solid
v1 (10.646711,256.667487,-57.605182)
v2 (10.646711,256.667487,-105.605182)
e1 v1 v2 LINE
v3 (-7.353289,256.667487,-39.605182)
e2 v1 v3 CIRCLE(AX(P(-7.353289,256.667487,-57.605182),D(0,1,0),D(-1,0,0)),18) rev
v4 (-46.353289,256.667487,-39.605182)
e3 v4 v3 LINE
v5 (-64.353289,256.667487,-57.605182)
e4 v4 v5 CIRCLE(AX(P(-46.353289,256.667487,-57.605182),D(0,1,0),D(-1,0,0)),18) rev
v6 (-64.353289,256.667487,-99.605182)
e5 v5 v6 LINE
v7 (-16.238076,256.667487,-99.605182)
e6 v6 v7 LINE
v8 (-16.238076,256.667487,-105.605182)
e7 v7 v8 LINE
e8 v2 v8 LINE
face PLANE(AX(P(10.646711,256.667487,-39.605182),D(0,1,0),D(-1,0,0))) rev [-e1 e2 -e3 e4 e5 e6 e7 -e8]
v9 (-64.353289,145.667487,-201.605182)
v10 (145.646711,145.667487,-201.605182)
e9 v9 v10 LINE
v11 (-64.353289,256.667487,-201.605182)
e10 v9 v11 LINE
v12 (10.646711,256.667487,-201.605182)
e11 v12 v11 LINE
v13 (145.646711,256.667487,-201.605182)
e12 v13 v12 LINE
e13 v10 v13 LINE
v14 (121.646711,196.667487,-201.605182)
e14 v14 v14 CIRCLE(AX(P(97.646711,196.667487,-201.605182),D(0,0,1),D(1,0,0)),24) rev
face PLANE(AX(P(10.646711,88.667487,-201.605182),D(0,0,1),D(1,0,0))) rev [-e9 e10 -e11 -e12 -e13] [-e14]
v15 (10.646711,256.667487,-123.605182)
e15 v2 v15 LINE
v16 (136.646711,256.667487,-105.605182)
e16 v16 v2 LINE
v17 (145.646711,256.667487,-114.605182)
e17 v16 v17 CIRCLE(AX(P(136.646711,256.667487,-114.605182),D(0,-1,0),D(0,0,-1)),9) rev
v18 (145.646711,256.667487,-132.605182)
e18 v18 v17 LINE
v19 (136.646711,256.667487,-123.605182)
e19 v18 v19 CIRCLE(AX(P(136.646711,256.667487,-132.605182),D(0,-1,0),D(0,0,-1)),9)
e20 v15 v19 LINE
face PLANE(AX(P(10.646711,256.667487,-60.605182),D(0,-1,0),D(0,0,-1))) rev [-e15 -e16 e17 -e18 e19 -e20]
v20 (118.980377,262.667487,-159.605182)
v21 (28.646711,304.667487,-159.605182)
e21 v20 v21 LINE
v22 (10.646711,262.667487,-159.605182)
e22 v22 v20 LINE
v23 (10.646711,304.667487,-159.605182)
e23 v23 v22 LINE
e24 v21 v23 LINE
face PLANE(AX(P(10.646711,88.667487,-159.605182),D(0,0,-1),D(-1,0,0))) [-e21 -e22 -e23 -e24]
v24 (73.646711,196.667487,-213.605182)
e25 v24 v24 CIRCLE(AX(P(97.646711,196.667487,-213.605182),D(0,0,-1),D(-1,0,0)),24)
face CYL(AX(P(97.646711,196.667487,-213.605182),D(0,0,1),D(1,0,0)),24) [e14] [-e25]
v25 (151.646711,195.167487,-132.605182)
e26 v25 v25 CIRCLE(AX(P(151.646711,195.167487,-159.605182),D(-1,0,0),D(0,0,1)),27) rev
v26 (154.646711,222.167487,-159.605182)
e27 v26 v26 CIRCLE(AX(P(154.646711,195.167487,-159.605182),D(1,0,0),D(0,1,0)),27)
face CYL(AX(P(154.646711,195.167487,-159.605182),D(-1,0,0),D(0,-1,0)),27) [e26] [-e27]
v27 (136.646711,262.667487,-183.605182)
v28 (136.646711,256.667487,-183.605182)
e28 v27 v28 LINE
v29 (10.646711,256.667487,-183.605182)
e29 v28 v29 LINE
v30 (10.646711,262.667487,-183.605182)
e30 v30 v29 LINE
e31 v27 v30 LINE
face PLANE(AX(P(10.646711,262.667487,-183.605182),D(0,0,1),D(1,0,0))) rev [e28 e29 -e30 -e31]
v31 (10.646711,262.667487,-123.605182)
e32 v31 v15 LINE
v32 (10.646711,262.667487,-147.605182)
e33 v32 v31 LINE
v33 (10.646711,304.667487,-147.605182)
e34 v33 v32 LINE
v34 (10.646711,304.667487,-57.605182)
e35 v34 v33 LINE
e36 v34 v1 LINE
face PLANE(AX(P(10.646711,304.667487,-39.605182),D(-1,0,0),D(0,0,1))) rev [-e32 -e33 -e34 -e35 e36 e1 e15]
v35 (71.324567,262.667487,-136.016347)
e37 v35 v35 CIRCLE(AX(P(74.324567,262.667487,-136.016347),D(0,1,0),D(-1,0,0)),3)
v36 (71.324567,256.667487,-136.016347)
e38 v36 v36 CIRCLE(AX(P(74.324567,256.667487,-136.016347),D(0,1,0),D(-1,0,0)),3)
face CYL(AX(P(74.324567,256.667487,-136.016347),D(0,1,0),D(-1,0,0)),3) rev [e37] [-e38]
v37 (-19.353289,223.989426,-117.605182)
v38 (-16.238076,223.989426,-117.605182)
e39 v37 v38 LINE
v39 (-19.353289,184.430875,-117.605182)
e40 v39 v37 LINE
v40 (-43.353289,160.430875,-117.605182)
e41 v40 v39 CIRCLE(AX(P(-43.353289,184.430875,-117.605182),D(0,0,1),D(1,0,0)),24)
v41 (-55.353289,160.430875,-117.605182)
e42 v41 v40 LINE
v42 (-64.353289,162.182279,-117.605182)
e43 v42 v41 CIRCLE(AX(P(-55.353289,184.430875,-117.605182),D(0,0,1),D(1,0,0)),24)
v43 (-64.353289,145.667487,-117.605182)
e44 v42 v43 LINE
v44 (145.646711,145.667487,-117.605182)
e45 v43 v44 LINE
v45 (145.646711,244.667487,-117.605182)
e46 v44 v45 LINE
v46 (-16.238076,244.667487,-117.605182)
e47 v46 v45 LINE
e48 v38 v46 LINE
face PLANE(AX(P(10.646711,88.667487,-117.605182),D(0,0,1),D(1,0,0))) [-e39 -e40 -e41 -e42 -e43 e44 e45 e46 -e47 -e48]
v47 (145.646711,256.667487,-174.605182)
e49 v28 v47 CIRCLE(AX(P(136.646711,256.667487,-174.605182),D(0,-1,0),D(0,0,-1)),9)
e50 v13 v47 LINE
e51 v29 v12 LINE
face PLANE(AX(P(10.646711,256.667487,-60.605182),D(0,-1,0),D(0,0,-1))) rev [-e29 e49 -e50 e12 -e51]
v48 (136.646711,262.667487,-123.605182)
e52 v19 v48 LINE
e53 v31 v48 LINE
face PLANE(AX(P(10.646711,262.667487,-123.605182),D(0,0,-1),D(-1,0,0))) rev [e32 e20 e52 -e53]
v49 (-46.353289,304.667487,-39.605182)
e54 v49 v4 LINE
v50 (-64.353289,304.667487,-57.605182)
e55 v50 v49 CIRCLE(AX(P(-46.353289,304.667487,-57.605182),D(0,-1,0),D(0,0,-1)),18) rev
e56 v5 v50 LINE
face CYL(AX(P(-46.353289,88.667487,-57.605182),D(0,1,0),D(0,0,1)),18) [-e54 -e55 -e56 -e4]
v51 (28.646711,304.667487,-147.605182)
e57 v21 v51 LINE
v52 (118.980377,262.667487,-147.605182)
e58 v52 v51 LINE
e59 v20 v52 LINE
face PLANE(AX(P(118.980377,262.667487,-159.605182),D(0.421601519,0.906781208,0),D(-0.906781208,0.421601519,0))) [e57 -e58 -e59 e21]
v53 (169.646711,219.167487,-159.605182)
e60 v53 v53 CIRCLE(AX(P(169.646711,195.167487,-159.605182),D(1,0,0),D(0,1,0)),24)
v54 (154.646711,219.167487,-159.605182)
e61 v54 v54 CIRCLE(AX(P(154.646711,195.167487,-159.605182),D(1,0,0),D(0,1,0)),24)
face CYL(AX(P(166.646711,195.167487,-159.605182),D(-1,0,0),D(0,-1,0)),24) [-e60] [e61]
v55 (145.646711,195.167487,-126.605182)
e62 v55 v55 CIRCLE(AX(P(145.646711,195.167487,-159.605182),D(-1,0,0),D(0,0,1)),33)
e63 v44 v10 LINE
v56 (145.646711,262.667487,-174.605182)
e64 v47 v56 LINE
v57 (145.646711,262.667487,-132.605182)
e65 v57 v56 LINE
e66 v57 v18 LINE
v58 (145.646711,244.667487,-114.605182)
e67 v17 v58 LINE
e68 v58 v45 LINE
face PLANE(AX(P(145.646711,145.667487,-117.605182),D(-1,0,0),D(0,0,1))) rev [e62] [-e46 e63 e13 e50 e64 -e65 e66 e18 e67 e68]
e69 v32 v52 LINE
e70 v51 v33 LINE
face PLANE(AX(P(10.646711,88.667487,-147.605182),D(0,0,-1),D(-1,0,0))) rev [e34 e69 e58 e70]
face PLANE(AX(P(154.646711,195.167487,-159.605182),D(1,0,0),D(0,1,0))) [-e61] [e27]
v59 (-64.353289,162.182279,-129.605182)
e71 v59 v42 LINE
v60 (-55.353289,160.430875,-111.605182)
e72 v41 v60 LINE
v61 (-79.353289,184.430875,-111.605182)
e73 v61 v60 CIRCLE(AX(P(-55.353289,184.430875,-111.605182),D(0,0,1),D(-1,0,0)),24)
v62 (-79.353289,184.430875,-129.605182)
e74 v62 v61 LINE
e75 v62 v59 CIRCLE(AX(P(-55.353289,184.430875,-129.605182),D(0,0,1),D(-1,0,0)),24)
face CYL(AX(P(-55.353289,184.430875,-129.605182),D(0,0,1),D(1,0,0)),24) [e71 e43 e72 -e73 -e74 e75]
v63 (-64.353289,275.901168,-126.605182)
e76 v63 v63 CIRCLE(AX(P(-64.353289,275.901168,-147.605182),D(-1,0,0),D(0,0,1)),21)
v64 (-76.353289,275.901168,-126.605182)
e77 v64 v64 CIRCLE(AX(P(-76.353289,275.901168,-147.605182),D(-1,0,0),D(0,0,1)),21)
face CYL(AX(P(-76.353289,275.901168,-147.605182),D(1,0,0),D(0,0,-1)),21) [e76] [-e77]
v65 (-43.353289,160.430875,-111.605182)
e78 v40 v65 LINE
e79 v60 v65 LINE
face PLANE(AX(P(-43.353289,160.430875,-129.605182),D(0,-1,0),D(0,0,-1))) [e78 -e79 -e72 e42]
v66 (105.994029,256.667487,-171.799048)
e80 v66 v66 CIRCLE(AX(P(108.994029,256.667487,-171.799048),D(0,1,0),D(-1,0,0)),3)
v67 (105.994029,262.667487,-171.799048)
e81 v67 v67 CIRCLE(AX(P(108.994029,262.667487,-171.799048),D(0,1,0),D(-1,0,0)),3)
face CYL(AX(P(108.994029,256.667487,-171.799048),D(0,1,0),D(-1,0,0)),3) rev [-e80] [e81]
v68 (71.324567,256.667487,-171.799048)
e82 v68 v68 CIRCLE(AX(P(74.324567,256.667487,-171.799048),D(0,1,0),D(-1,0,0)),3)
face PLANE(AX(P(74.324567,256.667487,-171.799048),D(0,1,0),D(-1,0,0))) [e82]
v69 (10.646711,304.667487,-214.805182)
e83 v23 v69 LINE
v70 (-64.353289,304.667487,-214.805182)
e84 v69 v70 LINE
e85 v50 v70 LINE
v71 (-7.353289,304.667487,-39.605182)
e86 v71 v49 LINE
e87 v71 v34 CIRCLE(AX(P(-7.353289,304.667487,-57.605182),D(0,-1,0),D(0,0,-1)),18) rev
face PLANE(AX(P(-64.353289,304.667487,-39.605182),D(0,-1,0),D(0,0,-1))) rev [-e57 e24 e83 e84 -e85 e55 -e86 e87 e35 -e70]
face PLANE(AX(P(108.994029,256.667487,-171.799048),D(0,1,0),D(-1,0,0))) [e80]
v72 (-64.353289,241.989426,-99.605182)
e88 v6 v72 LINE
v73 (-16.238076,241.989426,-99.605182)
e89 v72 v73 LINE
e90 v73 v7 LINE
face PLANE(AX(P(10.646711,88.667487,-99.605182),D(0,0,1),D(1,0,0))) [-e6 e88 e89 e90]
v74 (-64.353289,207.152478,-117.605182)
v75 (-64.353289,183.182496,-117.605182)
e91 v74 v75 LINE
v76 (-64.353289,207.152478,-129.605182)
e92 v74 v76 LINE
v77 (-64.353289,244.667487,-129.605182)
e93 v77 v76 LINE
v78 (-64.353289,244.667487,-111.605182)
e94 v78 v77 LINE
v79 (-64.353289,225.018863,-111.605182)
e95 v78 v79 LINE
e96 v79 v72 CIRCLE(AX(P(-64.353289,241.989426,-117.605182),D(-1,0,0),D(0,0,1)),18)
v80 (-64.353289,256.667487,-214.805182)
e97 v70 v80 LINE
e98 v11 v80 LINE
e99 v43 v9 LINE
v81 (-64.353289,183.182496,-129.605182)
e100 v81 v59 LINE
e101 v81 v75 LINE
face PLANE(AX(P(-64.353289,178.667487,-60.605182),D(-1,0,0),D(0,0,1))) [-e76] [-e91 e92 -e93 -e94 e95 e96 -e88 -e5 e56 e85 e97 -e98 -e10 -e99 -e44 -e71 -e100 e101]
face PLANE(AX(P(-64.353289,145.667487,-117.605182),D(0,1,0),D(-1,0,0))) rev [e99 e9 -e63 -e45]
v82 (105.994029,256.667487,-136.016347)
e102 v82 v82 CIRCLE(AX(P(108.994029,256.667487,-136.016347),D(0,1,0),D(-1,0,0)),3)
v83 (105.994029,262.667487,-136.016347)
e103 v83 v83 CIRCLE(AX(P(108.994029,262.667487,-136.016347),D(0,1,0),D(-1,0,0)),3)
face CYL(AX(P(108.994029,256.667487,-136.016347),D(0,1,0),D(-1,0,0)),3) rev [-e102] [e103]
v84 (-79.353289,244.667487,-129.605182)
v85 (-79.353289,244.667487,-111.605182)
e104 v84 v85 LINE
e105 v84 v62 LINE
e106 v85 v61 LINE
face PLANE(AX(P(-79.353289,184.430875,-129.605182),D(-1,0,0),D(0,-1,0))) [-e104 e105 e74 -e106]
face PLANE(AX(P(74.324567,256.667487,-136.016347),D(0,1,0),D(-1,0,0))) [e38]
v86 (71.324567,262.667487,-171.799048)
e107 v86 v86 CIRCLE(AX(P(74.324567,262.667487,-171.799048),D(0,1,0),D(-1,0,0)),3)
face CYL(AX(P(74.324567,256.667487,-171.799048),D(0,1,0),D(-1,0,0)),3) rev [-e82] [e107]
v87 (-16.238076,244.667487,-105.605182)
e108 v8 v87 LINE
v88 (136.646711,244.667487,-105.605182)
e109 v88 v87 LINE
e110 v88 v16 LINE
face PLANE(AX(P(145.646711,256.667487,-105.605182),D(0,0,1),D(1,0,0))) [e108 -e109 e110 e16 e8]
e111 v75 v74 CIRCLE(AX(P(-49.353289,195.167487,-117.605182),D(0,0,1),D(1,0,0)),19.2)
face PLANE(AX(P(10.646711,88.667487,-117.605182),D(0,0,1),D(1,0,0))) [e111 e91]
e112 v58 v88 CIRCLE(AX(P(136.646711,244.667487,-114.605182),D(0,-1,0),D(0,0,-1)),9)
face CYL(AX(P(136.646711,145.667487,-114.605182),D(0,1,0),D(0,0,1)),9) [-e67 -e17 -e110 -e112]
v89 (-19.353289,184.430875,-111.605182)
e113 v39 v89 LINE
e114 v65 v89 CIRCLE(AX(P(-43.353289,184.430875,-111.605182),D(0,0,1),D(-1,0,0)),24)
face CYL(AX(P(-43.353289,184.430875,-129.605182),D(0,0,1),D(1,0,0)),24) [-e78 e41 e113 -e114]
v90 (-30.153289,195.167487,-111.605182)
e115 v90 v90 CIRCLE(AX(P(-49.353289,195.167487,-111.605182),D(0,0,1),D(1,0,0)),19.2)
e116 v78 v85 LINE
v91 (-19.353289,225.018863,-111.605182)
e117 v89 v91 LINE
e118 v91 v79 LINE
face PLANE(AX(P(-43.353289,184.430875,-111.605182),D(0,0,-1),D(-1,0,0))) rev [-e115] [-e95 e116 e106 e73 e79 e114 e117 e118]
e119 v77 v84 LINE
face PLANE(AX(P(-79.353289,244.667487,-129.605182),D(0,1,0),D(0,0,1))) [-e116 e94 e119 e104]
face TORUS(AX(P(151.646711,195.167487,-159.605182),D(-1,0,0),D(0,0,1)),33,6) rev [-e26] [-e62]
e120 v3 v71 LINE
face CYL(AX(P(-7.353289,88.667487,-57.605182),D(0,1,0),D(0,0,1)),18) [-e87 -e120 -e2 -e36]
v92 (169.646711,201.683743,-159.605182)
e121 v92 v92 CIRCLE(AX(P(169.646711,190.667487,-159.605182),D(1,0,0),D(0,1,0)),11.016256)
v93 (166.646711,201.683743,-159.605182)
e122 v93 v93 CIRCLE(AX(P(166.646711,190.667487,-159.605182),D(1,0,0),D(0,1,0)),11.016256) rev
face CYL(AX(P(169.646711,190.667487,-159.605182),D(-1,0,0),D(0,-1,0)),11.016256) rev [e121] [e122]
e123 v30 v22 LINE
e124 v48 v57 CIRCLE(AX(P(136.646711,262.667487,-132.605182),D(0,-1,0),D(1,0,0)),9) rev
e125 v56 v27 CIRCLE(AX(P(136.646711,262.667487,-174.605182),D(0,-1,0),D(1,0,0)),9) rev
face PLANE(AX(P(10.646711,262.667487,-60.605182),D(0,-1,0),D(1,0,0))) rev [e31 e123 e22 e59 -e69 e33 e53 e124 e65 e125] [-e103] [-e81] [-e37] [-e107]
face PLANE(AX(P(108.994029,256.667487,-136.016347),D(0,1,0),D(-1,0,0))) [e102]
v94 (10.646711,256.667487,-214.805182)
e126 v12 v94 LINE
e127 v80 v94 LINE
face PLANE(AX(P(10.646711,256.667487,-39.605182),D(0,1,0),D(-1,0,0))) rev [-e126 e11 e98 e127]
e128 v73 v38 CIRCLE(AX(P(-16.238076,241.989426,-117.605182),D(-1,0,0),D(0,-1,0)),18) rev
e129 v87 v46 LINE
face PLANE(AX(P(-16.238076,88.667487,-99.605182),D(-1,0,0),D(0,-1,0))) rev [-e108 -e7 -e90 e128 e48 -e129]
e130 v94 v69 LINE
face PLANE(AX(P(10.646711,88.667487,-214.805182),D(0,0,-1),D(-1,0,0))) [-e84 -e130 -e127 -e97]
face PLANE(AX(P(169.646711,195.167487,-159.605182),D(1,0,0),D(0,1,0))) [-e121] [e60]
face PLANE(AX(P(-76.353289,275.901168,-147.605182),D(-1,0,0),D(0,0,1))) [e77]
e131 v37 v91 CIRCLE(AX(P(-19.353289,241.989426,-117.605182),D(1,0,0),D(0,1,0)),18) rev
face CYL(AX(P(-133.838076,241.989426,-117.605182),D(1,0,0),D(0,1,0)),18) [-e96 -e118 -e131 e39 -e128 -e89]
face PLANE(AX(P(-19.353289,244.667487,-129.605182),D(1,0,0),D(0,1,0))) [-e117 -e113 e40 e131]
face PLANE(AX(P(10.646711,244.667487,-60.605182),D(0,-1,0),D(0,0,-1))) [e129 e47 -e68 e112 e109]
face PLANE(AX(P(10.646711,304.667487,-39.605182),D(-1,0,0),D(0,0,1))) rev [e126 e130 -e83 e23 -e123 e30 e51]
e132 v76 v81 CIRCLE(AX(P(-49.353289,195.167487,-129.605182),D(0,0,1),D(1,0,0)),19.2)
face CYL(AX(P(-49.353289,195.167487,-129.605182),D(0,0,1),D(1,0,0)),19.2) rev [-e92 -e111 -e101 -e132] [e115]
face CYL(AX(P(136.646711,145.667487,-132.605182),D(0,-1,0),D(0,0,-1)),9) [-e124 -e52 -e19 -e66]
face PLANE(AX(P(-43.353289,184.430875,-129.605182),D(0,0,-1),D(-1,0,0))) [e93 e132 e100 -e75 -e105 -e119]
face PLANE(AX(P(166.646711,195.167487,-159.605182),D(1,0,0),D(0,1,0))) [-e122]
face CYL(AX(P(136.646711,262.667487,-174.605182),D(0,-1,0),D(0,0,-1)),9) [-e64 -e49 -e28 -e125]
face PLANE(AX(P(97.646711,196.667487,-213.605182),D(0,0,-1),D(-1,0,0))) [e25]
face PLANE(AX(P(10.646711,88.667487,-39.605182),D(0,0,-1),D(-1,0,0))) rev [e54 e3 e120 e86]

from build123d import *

# Parameters (mm, degrees)
BOSS_EXTRUDE1_DEPTH       = 150
BOSS_EXTRUDE1_DEPTH_BACK  = 100
SKETCH1_W                 = 250
SKETCH1_H                 = 230
SKETCH2_W                 = 200
SKETCH2_H                 = 30
BOSS_EXTRUDE2_DEPTH       = 150
BOSS_EXTRUDE3_DEPTH       = 120
BOSS_EXTRUDE3_DEPTH_BACK  = 20
SKETCH4_W                 = 350
SKETCH4_H                 = 165
RIB1_REACH                = 447.477
SKETCH5_WALL_W            = 1072.6047598
SKETCH5_WALL_H            = 250
SKETCH6_R                 = 45
BOSS_EXTRUDE4_DEPTH       = 15
SKETCH7_R                 = 40
BOSS_EXTRUDE5_DEPTH       = 20
SKETCH8_W                 = 100
SKETCH8_H                 = 100
SKETCH10_W                = 20
SKETCH10_H                = 100
BOSS_EXTRUDE6_DEPTH       = 150
RIB2_REACH                = 449.985
SKETCH12_WALL_W           = 999.204922194
SKETCH12_WALL_H           = 20
SKETCH13_R                = 32
CUT_EXTRUDE1_DEPTH        = 10
FILLET1_R                 = 50
FILLET2_R                 = 30
FILLET3_R                 = 15
FILLET4_R                 = 15
SKETCH14_R                = 40
SKETCH14_R_2              = 18.360426304
BOSS_EXTRUDE7_DEPTH       = 5
FILLET6_R                 = 10
SKETCH15_W                = 250
SKETCH15_H                = 230
SKETCH15_W_2              = 170
SKETCH15_H_2              = 165.671954638
CUT_EXTRUDE2_DEPTH        = 40
SKETCH16_R                = 50
SKETCH16_R_2              = 30
BOSS_EXTRUDE8_DEPTH       = 30
SKETCH16_2_R              = 30
BOSS_EXTRUDE9_DEPTH       = 50
SKETCH17_W                = 787.442297404
SKETCH17_H                = 468.570764298
CUT_EXTRUDE3_DEPTH        = 459.262102583
SKETCH18_W                = 754.820557273
SKETCH18_H                = 297.051261894
CUT_EXTRUDE4_DEPTH        = 391.736484091
BOSS_EXTRUDE10_DEPTH      = 30
BOSS_EXTRUDE11_DEPTH      = 20
BOSS_EXTRUDE12_DEPTH      = 100
BOSS_EXTRUDE12_DEPTH_BACK = 192
SKETCH23_W                = 125
SKETCH23_H                = 80
SKETCH26_W                = 38.43559463
SKETCH26_H                = 130.536564267
CUT_EXTRUDE8_DEPTH        = 196
SKETCH27_W                = 225
SKETCH27_H                = 100
BOSS_EXTRUDE14_DEPTH      = 10
BOSS_EXTRUDE15_DEPTH      = 10
BOSS_EXTRUDE15_DEPTH_BACK = 10
SKETCH29_R                = 35
BOSS_EXTRUDE16_DEPTH      = 20
FILLET7_R                 = 15
FILLET9_R                 = 15
SKETCH33_R                = 40
BOSS_EXTRUDE17_DEPTH      = 20
SKETCH31_R                = 5
CUT_EXTRUDE10_DEPTH       = 10
BOSS_EXTRUDE18_DEPTH      = 10
BOSS_EXTRUDE18_DEPTH_BACK = 20
SKETCH20_R                = 32
FILLET10_R                = 30
SCALE1_SCALE              = 0.6


with BuildPart() as part:
    # Sketch1 → Boss-Extrude1 (new, two sides: drawn at the far end of the back side and taken through both)
    with BuildSketch(Plane(origin=(0, 0, 0), x_dir=(1, 0, 0), z_dir=(0, 1, 0)).offset(-BOSS_EXTRUDE1_DEPTH_BACK)):
        Rectangle(SKETCH1_W, SKETCH1_H)
    extrude(amount=BOSS_EXTRUDE1_DEPTH + BOSS_EXTRUDE1_DEPTH_BACK)

    # Sketch2 → Boss-Extrude2 (add)
    with BuildSketch(Plane(origin=(125, 0, 0), x_dir=(0, 0, -1), z_dir=(1, 0, 0))):
        with Locations((0, -15)):
            Rectangle(SKETCH2_W, SKETCH2_H)
    extrude(amount=BOSS_EXTRUDE2_DEPTH)

    # Sketch4 → Boss-Extrude3 (add, two sides: drawn at the far end of the back side and taken through both)
    with BuildSketch(Plane(origin=(0, 0, -115), x_dir=(-1, 0, 0), z_dir=(0, 0, -1)).offset(-BOSS_EXTRUDE3_DEPTH_BACK)):
        with Locations((-50, 177.5)):
            Rectangle(SKETCH4_W, SKETCH4_H)
    extrude(amount=BOSS_EXTRUDE3_DEPTH + BOSS_EXTRUDE3_DEPTH_BACK)

    # Sketch5 wall → Rib1 (add, up to next)
    with BuildSketch(Plane(origin=(0, 205, -23.982044646), x_dir=(0, 0.612300963241, -0.790624772199), z_dir=(0, 0.790624772199, 0.612300963241)), mode=Mode.PRIVATE) as rib1_sk1:
        Rectangle(SKETCH5_WALL_W, SKETCH5_WALL_H)
    rib1_tool1 = extrude(rib1_sk1.sketch, amount=-RIB1_REACH, mode=Mode.PRIVATE) - part.part
    add(rib1_tool1.solids().sort_by_distance((0, 205, -23.982044646))[0])

    # Sketch6 → Boss-Extrude4 (add)
    with BuildSketch(Plane(origin=(225, 0, 0), x_dir=(0, 0, -1), z_dir=(1, 0, 0))):
        with Locations(Location((165, 177.5, 0), (0, 0, 90))):
            Circle(SKETCH6_R)
    extrude(amount=BOSS_EXTRUDE4_DEPTH)

    # Sketch7 → Boss-Extrude5 (add)
    with BuildSketch(Plane(origin=(240, 0, 0), x_dir=(0, 0, -1), z_dir=(1, 0, 0))):
        with Locations(Location((165, 177.5, 0), (0, 0, 90))):
            Circle(SKETCH7_R)
    extrude(amount=BOSS_EXTRUDE5_DEPTH)

    # Sweep1: sweep along a path in Sketch9
    with BuildLine(Plane(origin=(0, 0, 0), x_dir=(0, 0, -1), z_dir=(1, 0, 0))) as sweep1_path:
        ThreePointArc((23.982044646, 205), (3.428361586, 247.544867247), (-5.288861265, 293.983317287))
    # Sketch8 → Sweep1 (sweep)
    with BuildSketch(Plane(origin=(0, 116.533228497, 90.24939588), x_dir=(1, 0, 0), z_dir=(0, 0.7906247721978943, 0.6123009632419566))):
        with Locations((0, 144.482496049)):
            Rectangle(SKETCH8_W, SKETCH8_H)
    sweep(path=sweep1_path.line)

    # Sketch10 → Boss-Extrude6 (add)
    with BuildSketch(Plane(origin=(125, 0, 0), x_dir=(0, 0, -1), z_dir=(1, 0, 0))):
        with Locations((85, 164.273096985)):
            Rectangle(SKETCH10_W, SKETCH10_H)
    extrude(amount=BOSS_EXTRUDE6_DEPTH)

    # Sketch12 wall → Rib2 (add, up to next)
    with BuildSketch(Plane(origin=(160.792179202, 164.273096985, -35.792179202), x_dir=(0.707106781187, 0, -0.707106781187), z_dir=(0.707106781187, 0, 0.707106781187)), mode=Mode.PRIVATE) as rib2_sk1:
        Rectangle(SKETCH12_WALL_W, SKETCH12_WALL_H)
    rib2_tool1 = extrude(rib2_sk1.sketch, amount=-RIB2_REACH, mode=Mode.PRIVATE) - part.part
    add(rib2_tool1.solids().sort_by_distance((160.792179202, 164.273096985, -35.792179202))[0])

    # Sketch13 → Cut-Extrude1 (cut)
    with BuildSketch(Plane.XZ.offset(30)):
        with Locations(Location((218.869669038, 0, 0), (0, 0, 270))):
            Circle(SKETCH13_R)
    extrude(amount=-CUT_EXTRUDE1_DEPTH, mode=Mode.SUBTRACT)

    # Fillet1
    fillet1_edges = [part.edges().sort_by_distance(p)[0] for p in [
        (275, -15, 100),
        (275, -15, -100),
    ]]
    fillet(fillet1_edges, radius=FILLET1_R)

    # Fillet2
    fillet2_edges = [part.edges().sort_by_distance(p)[0] for p in [
        (125, 95, -105),
    ]]
    fillet(fillet2_edges, radius=FILLET2_R)

    # Fillet3
    fillet3_edges = [part.edges().sort_by_distance(p)[0] for p in [
        (125, 214.273096985, -85),
        (125, 114.273096985, -85),
    ]]
    fillet(fillet3_edges, radius=FILLET3_R)

    # Fillet4
    fillet4_edges = [part.edges().sort_by_distance(p)[0] for p in [
        (50, 205, -23.982044646),
        (0, 235.615048162, -63.513283256),
        (-50, 205, -23.982044646),
        (0, 174.384951838, 15.549193964),
    ]]
    fillet(fillet4_edges, radius=FILLET4_R)

    # Sketch14 → Boss-Extrude7 (add)
    with BuildSketch(Plane(origin=(260, 0, 0), x_dir=(0, 0, -1), z_dir=(1, 0, 0))):
        with Locations(Location((165, 177.5, 0), (0, 0, 90))):
            Circle(SKETCH14_R)
        with Locations(Location((165, 170, 0), (0, 0, 90))):
            Circle(SKETCH14_R_2, mode=Mode.SUBTRACT)
    extrude(amount=BOSS_EXTRUDE7_DEPTH)

    # Fillet6
    fillet6_edges = [part.edges().sort_by_distance(p)[0] for p in [
        (225, 132.5, -165),
    ]]
    fillet(fillet6_edges, radius=FILLET6_R)

    # Sketch15 → Cut-Extrude2 (cut)
    with BuildSketch(Plane.XZ.offset(100)):
        Rectangle(SKETCH15_W, SKETCH15_H)
        Rectangle(SKETCH15_W_2, SKETCH15_H_2, mode=Mode.SUBTRACT)
    extrude(amount=-CUT_EXTRUDE2_DEPTH, mode=Mode.SUBTRACT)

    # Sketch16 → Boss-Extrude8 (add)
    with BuildSketch(Plane.ZY.offset(125)):
        with Locations((0, 30)):
            Circle(SKETCH16_R)
        with Locations((0, 30)):
            Circle(SKETCH16_R_2, mode=Mode.SUBTRACT)
    extrude(amount=BOSS_EXTRUDE8_DEPTH)

    # Sketch16<2> → Boss-Extrude9 (add)
    with BuildSketch(Plane.ZY.offset(125)):
        with Locations((0, 30)):
            Circle(SKETCH16_2_R)
    extrude(amount=BOSS_EXTRUDE9_DEPTH)

    # Sketch17 → Cut-Extrude3 (cut, through all)
    with BuildSketch(Plane.XY.offset(-95)):
        with Locations((43.842387257, 99.928182048)):
            Rectangle(SKETCH17_W, SKETCH17_H)
    extrude(amount=CUT_EXTRUDE3_DEPTH, mode=Mode.SUBTRACT)

    # Sketch18 → Cut-Extrude4 (cut, through all)
    with BuildSketch(Plane.XZ.offset(-95)):
        with Locations((103.1212944, -159.735098903)):
            Rectangle(SKETCH18_W, SKETCH18_H)
    extrude(amount=CUT_EXTRUDE4_DEPTH, mode=Mode.SUBTRACT)

    # Sketch19 → Boss-Extrude10 (add)
    with BuildSketch(Plane(origin=(0, 0, -95), x_dir=(-1, 0, 0), z_dir=(0, 0, -1))):
        Polygon((125, 260), (44.807978096, 260), (44.807978096, 161.220017504), (100, 95), (125, 177.5), align=None)
    extrude(amount=-BOSS_EXTRUDE10_DEPTH)

    # Sketch22 → Boss-Extrude11 (add)
    with BuildSketch(Plane(origin=(0, 260, 0), x_dir=(1, 0, 0), z_dir=(0, 1, 0))):
        Polygon((225, 95), (225, 75), (-44.807978096, 75), (-44.807978096, 65), (-125, 65), (-125, 235), (225, 235), align=None)
    extrude(amount=BOSS_EXTRUDE11_DEPTH)

    # Sketch23 → Boss-Extrude12 (add, two sides: drawn at the far end of the back side and taken through both)
    with BuildSketch(Plane.XY.offset(-65).offset(-BOSS_EXTRUDE12_DEPTH_BACK)):
        with Locations((-62.5, 320)):
            Rectangle(SKETCH23_W, SKETCH23_H)
    extrude(amount=BOSS_EXTRUDE12_DEPTH + BOSS_EXTRUDE12_DEPTH_BACK)

    # Sketch26 → Cut-Extrude8 (cut)
    with BuildSketch(Plane(origin=(-44.807978096, 0, 0), x_dir=(0, 0, -1), z_dir=(1, 0, 0))):
        with Locations((75.782202685, 160.268282134)):
            Rectangle(SKETCH26_W, SKETCH26_H)
    extrude(amount=-CUT_EXTRUDE8_DEPTH, mode=Mode.SUBTRACT)

    # Sketch27 → Boss-Extrude14 (add)
    with BuildSketch(Plane(origin=(0, 280, 0), x_dir=(1, 0, 0), z_dir=(0, 1, 0))):
        with Locations((112.5, 155)):
            Rectangle(SKETCH27_W, SKETCH27_H)
    extrude(amount=BOSS_EXTRUDE14_DEPTH)

    # Sketch28 → Boss-Extrude15 (add, two sides: drawn at the far end of the back side and taken through both)
    with BuildSketch(Plane.XY.offset(-155).offset(-BOSS_EXTRUDE15_DEPTH_BACK)):
        Polygon((0, 360), (0, 290), (180.556109721, 290), (30, 360), align=None)
    extrude(amount=BOSS_EXTRUDE15_DEPTH + BOSS_EXTRUDE15_DEPTH_BACK)

    # Sketch29 → Boss-Extrude16 (add)
    with BuildSketch(Plane.ZY.offset(125)):
        with Locations((-145, 312.056134744)):
            Circle(SKETCH29_R)
    extrude(amount=BOSS_EXTRUDE16_DEPTH)

    # Fillet7
    fillet7_edges = [part.edges().sort_by_distance(p)[0] for p in [
        (225, 270, -75),
    ]]
    fillet(fillet7_edges, radius=FILLET7_R)

    # Fillet9
    fillet9_edges = [part.edges().sort_by_distance(p)[0] for p in [
        (225, 285, -205),
        (225, 285, -105),
    ]]
    fillet(fillet9_edges, radius=FILLET9_R)

    # Sketch33 → Boss-Extrude17 (add)
    with BuildSketch(Plane(origin=(0, 0, -235), x_dir=(-1, 0, 0), z_dir=(0, 0, -1))):
        with Locations(Location((-145, 180, 0), (0, 0, 180))):
            Circle(SKETCH33_R)
    extrude(amount=BOSS_EXTRUDE17_DEPTH)

    # Sketch31 → Cut-Extrude10 (cut)
    with BuildSketch(Plane(origin=(0, 290, 0), x_dir=(1, 0, 0), z_dir=(0, 1, 0))):
        with Locations(Location((106.129760479, 125.68527506, 0), (0, 0, 180))):
            Circle(SKETCH31_R)
        with Locations(Location((163.912196034, 125.68527506, 0), (0, 0, 180))):
            Circle(SKETCH31_R)
        with Locations((230.176456992, 125.68527506)):
            Circle(SKETCH31_R)
        with Locations(Location((163.912196034, 185.323109922, 0), (0, 0, 180))):
            Circle(SKETCH31_R)
        with Locations(Location((106.129760479, 185.323109922, 0), (0, 0, 180))):
            Circle(SKETCH31_R)
        with Locations((230.176456992, 185.323109922)):
            Circle(SKETCH31_R)
    extrude(amount=-CUT_EXTRUDE10_DEPTH, mode=Mode.SUBTRACT)

    # Sketch20 → Boss-Extrude18 (add, two sides: drawn at the far end of the back side and taken through both)
    with BuildSketch(Plane.XY.offset(-95).offset(-BOSS_EXTRUDE18_DEPTH_BACK)):
        with BuildLine():
            Line((-50, 260), (-50, 159.605646018))
            ThreePointArc((-50, 159.605646018), (-61.715728753, 131.321374771), (-90, 119.605646018))
            Line((-90, 119.605646018), (-110, 119.605646018))
            ThreePointArc((-110, 119.605646018), (-138.284271247, 131.321374771), (-150, 159.605646018))
            Line((-150, 159.605646018), (-150, 260))
            Line((-150, 260), (-50, 260))
        make_face()
        with Locations((-100, 177.5)):
            Circle(SKETCH20_R, mode=Mode.SUBTRACT)
    extrude(amount=BOSS_EXTRUDE18_DEPTH + BOSS_EXTRUDE18_DEPTH_BACK)

    # Fillet10
    fillet10_edges = [part.edges().sort_by_distance(p)[0] for p in [
        (-84.903989048, 225.536564267, -65),
        (-125, 320, 35),
        (0, 320, 35),
    ]]
    fillet(fillet10_edges, radius=FILLET10_R - 0.0001)  # a hair under: the kernel refuses the full size


with BuildPart() as part_1:
    # Scale1: scaled about (26.616775413, 221.668719116, -151.512951555)
    add(part.part.scale(SCALE1_SCALE).moved(Location((10.646710165, 88.667487646, -60.605180622))))


solid = part_1.part
